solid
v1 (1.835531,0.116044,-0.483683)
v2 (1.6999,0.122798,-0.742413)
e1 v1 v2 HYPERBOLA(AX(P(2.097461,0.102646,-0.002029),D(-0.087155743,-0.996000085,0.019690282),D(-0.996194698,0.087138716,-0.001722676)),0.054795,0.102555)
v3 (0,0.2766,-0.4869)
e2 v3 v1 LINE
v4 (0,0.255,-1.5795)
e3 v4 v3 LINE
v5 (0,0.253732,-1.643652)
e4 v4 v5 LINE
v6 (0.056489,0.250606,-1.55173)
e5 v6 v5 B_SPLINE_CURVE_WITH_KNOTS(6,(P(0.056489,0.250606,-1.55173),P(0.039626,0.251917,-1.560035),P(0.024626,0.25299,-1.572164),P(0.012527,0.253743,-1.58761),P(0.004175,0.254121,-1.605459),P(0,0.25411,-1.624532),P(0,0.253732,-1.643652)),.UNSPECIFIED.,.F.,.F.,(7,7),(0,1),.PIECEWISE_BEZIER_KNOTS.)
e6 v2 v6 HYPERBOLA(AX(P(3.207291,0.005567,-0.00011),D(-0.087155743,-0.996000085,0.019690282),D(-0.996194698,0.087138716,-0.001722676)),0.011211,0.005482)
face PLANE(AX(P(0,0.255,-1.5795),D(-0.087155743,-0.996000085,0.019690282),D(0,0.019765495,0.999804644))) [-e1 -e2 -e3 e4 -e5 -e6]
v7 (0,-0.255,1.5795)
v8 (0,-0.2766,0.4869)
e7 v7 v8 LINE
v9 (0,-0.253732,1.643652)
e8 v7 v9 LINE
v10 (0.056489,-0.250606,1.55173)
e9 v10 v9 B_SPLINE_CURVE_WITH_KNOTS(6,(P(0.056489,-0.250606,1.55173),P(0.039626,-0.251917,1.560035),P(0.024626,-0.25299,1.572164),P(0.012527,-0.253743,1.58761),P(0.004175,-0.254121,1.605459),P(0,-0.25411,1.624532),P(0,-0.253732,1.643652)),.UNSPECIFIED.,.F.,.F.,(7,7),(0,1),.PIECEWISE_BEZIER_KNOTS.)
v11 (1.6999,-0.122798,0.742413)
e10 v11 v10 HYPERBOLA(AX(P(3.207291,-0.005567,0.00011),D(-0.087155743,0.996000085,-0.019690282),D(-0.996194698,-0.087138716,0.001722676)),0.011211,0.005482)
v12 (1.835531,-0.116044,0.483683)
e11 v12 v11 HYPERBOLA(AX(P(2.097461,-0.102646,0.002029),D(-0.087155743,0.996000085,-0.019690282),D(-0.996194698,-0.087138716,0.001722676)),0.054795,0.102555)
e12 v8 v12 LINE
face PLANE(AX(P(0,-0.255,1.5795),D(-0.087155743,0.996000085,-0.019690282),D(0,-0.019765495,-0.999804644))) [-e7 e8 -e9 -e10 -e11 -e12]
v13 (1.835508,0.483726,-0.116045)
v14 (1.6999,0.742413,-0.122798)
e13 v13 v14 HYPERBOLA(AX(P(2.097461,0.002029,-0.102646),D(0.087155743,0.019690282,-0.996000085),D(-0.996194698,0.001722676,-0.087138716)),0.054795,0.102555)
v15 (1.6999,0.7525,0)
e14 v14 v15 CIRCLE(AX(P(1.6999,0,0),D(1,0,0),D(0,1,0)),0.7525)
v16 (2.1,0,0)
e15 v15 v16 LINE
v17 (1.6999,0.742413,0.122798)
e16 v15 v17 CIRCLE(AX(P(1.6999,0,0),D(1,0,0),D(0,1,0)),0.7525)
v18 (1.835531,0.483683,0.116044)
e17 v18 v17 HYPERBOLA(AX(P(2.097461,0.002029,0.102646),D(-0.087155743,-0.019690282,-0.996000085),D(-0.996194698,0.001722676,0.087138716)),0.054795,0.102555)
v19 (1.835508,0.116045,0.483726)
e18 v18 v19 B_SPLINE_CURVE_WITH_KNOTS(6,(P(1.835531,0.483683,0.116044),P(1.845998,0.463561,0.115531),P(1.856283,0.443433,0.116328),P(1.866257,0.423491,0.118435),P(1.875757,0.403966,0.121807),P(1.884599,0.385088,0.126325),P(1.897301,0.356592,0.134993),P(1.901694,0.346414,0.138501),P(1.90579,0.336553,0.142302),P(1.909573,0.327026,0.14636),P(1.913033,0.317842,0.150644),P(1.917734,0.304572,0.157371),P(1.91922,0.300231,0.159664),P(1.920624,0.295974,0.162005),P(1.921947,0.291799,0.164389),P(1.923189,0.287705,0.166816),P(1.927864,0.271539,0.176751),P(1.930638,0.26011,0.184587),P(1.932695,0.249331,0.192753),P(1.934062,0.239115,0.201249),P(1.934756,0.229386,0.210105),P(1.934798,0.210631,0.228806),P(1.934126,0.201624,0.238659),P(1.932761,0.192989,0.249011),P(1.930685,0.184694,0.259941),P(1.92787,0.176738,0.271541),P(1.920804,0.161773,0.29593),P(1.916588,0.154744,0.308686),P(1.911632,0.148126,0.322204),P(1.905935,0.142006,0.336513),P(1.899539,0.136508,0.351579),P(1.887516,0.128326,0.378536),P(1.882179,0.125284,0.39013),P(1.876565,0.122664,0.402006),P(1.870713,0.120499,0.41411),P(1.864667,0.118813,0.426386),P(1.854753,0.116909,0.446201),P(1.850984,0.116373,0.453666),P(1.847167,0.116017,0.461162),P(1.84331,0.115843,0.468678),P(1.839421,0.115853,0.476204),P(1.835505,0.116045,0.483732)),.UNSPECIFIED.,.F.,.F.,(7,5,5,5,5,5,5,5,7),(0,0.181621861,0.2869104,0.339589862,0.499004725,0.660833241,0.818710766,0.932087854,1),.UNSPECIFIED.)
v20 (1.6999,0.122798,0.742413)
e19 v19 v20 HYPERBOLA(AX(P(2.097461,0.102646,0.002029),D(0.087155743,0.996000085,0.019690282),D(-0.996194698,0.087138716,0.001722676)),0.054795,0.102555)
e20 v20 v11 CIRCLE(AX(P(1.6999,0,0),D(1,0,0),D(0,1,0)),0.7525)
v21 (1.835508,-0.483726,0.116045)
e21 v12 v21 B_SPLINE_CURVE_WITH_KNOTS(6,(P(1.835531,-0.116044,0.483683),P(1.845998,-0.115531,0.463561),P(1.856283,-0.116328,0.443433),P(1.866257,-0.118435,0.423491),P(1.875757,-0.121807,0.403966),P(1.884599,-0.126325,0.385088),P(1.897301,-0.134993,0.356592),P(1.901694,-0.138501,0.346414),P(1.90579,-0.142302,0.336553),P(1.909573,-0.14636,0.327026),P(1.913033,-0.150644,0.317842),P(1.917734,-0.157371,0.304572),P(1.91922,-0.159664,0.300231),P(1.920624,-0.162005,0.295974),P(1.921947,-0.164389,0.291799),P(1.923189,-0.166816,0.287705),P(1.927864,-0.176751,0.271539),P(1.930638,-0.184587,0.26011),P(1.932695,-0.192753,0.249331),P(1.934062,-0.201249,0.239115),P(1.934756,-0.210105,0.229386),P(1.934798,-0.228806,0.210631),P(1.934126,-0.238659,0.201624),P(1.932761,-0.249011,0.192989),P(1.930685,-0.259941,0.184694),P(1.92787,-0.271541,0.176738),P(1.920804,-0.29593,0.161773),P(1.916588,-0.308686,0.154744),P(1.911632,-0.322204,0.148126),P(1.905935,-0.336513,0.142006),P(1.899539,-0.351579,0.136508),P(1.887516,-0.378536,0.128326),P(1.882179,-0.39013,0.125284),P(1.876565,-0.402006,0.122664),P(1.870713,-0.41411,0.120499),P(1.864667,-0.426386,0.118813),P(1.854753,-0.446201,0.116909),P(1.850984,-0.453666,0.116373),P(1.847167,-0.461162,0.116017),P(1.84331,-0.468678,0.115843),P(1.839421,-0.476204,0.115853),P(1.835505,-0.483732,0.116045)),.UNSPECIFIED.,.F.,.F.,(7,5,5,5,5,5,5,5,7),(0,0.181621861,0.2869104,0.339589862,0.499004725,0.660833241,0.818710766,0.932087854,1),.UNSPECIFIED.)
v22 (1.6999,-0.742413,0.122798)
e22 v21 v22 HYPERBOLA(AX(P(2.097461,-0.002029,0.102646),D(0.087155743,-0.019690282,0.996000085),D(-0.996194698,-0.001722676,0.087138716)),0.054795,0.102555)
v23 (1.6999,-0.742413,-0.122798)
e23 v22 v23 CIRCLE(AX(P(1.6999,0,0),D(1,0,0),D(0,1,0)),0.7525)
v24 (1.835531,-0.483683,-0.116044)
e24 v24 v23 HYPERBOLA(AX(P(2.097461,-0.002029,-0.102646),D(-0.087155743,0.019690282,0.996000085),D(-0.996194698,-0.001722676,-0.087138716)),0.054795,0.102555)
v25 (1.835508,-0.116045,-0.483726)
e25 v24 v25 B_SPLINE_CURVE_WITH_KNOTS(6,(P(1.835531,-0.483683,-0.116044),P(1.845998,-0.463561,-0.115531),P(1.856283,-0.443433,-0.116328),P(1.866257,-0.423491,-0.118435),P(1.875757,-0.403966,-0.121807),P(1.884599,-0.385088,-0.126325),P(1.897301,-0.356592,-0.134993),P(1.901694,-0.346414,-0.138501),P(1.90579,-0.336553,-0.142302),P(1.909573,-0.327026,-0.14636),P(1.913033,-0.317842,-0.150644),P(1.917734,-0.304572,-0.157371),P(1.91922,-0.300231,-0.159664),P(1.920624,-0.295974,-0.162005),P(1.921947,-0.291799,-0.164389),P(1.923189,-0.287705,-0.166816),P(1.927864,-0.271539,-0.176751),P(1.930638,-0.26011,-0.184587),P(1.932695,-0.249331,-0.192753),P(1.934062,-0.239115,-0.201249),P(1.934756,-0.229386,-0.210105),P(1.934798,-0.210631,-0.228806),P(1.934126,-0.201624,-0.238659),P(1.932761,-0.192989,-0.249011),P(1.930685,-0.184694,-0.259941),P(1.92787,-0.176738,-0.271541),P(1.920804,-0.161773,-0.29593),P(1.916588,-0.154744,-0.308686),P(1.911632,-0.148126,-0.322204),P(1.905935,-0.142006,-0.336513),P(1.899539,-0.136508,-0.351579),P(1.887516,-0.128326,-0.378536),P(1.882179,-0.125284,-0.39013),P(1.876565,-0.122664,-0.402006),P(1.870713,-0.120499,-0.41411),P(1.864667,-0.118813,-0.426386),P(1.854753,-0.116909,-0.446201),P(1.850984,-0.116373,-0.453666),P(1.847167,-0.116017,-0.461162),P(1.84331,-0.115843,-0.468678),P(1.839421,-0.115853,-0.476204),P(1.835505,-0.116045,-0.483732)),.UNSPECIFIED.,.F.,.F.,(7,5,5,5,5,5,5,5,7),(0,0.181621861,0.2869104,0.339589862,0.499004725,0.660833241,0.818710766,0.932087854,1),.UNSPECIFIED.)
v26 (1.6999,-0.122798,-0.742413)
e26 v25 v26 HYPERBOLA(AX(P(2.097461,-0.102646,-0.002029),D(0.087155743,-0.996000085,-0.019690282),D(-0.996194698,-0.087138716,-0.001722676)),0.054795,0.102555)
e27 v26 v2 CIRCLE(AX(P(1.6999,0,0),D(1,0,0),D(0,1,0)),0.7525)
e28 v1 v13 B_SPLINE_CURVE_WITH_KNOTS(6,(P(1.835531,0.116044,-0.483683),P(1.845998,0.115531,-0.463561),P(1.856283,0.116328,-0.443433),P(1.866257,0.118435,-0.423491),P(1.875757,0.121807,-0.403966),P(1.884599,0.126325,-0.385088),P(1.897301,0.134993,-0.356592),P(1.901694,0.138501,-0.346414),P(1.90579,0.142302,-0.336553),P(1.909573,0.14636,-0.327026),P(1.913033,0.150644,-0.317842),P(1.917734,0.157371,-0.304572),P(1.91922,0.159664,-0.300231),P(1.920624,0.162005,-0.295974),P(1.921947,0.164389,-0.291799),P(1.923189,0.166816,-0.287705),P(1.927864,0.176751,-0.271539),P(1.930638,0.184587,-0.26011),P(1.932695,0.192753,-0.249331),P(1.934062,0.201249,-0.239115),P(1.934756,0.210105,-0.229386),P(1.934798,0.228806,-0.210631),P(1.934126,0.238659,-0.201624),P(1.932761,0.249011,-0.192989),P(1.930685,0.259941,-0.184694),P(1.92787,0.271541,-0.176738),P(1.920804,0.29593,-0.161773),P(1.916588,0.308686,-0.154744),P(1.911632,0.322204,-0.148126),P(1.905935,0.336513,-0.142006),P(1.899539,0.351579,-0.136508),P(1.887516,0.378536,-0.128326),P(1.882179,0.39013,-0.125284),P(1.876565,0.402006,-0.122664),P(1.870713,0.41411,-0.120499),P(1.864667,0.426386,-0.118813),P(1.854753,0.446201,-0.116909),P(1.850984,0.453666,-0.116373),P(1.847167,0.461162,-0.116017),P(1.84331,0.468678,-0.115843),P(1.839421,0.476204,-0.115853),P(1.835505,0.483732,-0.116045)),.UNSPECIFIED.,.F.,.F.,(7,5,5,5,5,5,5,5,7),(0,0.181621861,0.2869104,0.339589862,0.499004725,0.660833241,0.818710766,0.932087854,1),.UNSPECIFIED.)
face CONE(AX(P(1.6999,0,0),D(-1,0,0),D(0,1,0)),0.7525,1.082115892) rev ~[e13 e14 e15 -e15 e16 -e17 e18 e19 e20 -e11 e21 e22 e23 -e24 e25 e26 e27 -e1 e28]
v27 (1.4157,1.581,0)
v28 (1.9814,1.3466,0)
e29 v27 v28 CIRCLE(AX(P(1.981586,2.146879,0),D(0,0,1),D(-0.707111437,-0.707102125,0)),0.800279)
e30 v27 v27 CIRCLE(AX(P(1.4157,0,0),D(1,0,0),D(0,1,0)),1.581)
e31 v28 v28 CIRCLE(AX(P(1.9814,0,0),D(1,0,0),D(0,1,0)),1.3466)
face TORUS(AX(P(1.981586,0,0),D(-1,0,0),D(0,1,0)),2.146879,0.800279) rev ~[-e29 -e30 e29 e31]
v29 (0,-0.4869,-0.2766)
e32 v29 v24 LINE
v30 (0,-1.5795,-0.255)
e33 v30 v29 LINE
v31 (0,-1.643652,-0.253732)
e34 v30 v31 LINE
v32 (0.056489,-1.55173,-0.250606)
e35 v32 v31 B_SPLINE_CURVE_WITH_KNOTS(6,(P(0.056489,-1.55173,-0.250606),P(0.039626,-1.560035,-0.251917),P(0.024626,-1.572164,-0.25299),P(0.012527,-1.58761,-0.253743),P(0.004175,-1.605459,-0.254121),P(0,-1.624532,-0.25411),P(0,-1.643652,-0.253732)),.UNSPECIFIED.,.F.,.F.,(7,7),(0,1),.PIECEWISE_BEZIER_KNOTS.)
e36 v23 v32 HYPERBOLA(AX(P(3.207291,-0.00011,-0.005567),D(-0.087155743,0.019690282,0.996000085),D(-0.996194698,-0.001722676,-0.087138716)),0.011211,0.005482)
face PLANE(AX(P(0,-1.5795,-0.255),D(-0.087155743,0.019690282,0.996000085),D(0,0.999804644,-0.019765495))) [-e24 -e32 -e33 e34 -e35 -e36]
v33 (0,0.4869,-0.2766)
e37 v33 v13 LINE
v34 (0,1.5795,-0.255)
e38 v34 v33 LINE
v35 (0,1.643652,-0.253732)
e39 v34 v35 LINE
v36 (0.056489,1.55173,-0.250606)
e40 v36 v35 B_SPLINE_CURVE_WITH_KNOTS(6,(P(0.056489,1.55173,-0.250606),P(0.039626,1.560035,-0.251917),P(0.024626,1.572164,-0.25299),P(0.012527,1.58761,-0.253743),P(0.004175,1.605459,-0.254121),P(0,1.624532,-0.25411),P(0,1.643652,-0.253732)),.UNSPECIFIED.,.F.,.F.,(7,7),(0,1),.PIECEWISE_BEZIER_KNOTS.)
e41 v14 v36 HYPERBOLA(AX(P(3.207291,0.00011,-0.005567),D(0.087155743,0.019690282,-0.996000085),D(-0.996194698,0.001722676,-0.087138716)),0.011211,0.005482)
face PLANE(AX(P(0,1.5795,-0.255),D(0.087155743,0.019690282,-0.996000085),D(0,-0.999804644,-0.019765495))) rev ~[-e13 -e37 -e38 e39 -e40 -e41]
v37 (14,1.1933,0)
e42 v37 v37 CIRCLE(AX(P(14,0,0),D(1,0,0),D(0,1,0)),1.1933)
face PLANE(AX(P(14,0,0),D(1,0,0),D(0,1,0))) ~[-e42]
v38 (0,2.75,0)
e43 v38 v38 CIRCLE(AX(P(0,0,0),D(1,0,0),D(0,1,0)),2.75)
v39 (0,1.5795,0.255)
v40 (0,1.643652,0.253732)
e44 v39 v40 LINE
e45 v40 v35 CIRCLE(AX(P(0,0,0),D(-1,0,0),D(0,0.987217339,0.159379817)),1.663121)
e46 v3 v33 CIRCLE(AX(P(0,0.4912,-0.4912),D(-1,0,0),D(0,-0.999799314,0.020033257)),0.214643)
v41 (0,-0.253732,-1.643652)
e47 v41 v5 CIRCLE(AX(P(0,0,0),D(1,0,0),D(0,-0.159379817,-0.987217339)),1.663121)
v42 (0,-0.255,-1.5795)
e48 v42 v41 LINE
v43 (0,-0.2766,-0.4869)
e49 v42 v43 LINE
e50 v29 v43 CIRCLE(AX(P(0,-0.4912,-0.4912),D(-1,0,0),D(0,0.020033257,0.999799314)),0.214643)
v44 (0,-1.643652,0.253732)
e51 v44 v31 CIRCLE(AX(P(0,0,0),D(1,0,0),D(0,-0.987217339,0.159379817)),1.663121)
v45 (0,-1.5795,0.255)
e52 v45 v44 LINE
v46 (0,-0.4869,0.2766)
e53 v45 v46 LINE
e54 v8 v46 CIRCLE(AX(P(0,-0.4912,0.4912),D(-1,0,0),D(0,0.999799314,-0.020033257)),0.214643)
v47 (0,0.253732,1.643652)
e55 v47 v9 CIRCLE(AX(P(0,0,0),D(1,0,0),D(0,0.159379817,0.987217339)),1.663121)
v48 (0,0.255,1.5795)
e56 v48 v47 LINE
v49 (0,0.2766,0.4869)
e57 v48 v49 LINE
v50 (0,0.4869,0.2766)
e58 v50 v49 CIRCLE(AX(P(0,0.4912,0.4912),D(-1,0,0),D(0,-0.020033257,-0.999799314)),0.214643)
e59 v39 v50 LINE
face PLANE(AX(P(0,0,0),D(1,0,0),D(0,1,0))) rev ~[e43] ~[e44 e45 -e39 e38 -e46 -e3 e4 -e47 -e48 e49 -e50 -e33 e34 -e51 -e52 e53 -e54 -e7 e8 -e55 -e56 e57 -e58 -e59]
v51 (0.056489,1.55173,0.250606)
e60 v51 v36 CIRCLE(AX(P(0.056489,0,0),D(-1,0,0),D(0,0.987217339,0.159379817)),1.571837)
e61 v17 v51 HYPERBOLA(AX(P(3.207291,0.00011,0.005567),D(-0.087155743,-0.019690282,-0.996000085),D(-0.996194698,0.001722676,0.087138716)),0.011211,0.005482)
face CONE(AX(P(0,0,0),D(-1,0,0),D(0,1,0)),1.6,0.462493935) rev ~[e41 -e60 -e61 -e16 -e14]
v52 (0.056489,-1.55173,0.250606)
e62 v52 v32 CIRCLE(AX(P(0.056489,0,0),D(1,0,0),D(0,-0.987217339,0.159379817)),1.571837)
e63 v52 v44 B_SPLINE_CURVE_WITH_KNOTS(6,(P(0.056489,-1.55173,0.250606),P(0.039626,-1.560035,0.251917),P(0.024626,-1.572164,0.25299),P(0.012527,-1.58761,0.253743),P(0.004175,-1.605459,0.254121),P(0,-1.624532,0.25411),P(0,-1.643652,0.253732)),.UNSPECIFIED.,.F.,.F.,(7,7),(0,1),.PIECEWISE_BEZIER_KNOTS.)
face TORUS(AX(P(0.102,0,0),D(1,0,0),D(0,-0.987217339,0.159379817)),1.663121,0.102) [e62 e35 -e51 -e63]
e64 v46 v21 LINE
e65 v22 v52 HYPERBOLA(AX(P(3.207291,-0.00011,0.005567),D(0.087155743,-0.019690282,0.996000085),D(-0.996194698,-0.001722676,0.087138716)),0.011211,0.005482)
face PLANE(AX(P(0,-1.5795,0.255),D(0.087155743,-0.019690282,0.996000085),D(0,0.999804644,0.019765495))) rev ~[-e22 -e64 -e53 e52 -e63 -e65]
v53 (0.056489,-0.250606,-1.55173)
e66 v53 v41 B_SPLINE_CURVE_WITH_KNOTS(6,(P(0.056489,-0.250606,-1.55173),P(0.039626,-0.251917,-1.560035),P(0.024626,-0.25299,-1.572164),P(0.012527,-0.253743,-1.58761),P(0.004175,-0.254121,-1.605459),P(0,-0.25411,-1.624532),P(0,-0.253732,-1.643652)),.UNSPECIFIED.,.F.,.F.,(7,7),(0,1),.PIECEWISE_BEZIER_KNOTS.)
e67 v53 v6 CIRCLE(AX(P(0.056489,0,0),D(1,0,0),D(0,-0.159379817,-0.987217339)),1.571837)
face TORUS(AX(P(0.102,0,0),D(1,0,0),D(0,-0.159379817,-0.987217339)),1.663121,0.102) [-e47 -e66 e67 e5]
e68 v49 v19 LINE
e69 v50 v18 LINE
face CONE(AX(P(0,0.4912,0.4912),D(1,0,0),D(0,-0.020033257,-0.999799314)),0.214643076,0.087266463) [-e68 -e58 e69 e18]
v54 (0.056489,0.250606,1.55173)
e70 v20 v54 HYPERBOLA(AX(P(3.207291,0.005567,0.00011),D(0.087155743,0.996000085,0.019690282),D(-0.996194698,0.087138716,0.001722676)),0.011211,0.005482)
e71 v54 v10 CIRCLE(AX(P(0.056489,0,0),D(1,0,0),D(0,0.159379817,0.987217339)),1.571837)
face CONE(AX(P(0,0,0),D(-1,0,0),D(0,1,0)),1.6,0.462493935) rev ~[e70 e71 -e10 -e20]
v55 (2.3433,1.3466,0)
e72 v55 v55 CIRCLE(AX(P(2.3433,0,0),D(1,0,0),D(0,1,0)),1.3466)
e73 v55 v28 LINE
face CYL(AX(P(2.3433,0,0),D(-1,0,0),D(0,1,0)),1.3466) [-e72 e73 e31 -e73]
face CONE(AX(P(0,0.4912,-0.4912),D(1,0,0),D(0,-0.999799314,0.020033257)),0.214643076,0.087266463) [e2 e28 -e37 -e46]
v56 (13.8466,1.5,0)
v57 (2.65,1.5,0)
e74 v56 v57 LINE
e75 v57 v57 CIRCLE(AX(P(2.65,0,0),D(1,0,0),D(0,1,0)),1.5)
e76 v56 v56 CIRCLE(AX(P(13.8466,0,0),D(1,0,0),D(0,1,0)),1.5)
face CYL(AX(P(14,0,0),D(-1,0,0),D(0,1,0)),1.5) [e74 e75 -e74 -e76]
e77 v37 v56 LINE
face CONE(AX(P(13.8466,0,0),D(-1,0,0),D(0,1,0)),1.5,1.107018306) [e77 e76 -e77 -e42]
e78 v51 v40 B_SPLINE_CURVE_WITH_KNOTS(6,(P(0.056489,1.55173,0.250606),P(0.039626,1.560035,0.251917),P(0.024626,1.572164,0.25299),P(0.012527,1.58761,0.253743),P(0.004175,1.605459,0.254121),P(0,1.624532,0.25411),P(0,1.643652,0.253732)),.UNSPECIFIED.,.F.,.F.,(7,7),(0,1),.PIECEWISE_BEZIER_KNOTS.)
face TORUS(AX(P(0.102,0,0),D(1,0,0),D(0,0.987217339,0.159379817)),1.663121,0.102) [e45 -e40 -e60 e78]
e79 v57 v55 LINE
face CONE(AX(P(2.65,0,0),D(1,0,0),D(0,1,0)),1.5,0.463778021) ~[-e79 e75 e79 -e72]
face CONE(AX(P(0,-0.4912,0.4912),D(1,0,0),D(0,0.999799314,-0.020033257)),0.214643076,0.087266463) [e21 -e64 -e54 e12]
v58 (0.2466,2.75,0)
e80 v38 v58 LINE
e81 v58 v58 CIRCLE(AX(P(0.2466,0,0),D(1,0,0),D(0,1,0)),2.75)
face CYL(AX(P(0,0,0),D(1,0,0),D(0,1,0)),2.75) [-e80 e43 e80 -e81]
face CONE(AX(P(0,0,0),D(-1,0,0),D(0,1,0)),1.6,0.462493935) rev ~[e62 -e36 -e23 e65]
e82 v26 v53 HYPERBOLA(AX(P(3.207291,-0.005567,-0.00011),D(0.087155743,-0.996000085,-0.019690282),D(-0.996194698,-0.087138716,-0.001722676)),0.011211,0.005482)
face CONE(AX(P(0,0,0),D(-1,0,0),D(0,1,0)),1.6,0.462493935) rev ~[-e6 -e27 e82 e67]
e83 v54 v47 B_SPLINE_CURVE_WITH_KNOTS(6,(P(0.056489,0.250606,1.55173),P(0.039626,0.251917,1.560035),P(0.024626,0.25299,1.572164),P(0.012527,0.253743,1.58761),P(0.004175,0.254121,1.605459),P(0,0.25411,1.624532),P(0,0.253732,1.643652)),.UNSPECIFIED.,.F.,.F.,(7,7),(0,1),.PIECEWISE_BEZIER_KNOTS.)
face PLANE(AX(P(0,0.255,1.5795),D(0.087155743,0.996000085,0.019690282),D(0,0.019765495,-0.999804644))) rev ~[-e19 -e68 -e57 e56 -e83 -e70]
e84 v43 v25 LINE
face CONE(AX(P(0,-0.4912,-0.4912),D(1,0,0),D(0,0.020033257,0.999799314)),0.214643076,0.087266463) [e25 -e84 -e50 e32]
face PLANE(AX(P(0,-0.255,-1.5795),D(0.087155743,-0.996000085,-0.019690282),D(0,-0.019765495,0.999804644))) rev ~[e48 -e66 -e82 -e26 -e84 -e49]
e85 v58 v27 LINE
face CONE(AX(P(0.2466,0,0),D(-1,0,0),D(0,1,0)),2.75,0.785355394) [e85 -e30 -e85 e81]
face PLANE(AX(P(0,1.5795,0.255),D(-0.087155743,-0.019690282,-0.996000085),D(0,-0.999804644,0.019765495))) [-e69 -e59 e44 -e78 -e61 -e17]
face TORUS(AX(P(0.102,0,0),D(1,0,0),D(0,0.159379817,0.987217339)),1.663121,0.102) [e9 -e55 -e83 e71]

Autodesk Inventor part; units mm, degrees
ref_plane "YZ Plane" through (0, 0, 0) normal (1, 0, 0) x (0, 1, 0)
ref_plane "XZ Plane" through (0, 0, 0) normal (0, 1, 0) x (-1, 0, 0)
sketch "Sketch1" plane through (0, 0, 0) normal (0, 0, 1) x (1, 0, 0)
  line L0 (2.1, 0) -> (14, 0)
  line L1 (14, 0) -> (14, 1.5)
  line L2 (14, 1.5) -> (2.65, 1.5)
  line L3 (2.65, 1.5) -> (2.3433, 1.3466)
  line L4 (2.3433, 1.3466) -> (1.9814, 1.3466)
  line L5 (0, 2.75) -> (0, 1.6)
  line L6 (0, 1.6) -> (1.6999, 0.7525)
  line L7 (1.6999, 0.7525) -> (2.1, 0)
  line L8 (-2.8, 0) -> (16.8, 0) projected
  line L9 (0, -0.55) -> (0, 3.3) projected
  line L10 (0, 2.75) -> (0.2466, 2.75)
  line L11 (0.2466, 2.75) -> (1.4157, 1.581)
  line L12 (2.65, 1.5) -> (1.4966, 1.5) construction
  arc A0 (1.4157, 1.581) -> (1.9814, 1.3466) centre (1.9814, 2.1466) ccw
  point P0 (1.65, 1.3466)
  dimension "d1" = 11.35
  dimension "d2" = 3
  dimension "d3" = 2.6933
  dimension "d4" = 3.2
  dimension "d5" = 26.5
  dimension "d6" = 62
  dimension "d7" = 2.1
  dimension "d8" = 0.3067
  dimension "d12" = 5.5
  dimension "d13" = 45
  dimension "d15" = 14
  dimension "d24" = 1.65
  dimension "d93" = 0.8
revolve "Body" add sketch "Sketch1" angle 360 about axis through (2.1, 0, 0) along (1, 0, 0) contours L7 L6 L5 L10 L11 A0 L4 L3 L2 L1 L0
sketch "Sketch2" plane through (0, 0, 0) normal (-1, 0, 0) x (0, 0, 1)
  line L0 (0, 1.6) -> (0, 0) construction
  line L1 (0, 0) -> (1.6, 0) construction
  arc A0 (0.48, 0) -> (0, 0.48) centre (0, 0) ccw construction
  arc A1 (0.56, 0) -> (0, 0.56) centre (0, 0) ccw construction
  arc A2 (1.5795, 0.255) -> (0.255, 1.5795) centre (0, 0) ccw
  line L2 (0, 0) -> (1.1314, 1.1314) construction
  line L3 (0.255, 1.5795) -> (0.2766, 0.4869)
  line L4 (1.5795, 0.255) -> (0.4869, 0.2766)
  arc A3 (0.255, 1.5795) -> (0, 1.6) centre (0, 0) ccw
  arc A4 (1.6, 0) -> (1.5795, 0.255) centre (0, 0) ccw
  line L5 (0, -3.85) -> (0, 3.85) projected
  line L6 (-3.85, 0) -> (3.85, 0) projected
  arc A5 (0.255, -1.5795) -> (1.5795, -0.255) centre (0, 0) ccw
  line L7 (0.255, -1.5795) -> (0.2766, -0.4869)
  line L8 (1.5795, -0.255) -> (0.4869, -0.2766)
  arc A6 (0, -1.6) -> (0.255, -1.5795) centre (0, 0) ccw
  arc A7 (1.5795, -0.255) -> (1.6, 0) centre (0, 0) ccw
  arc A8 (-0.255, 1.5795) -> (-1.5795, 0.255) centre (0, 0) ccw
  line L9 (-0.255, 1.5795) -> (-0.2766, 0.4869)
  line L10 (-1.5795, 0.255) -> (-0.4869, 0.2766)
  arc A9 (0, 1.6) -> (-0.255, 1.5795) centre (0, 0) ccw
  arc A10 (-1.5795, 0.255) -> (-1.6, 0) centre (0, 0) ccw
  arc A11 (-0.255, -1.5795) -> (0, -1.6) centre (0, 0) ccw
  arc A12 (-1.5795, -0.255) -> (-0.255, -1.5795) centre (0, 0) ccw
  arc A13 (-1.6, 0) -> (-1.5795, -0.255) centre (0, 0) ccw
  line L11 (-1.5795, -0.255) -> (-0.4869, -0.2766)
  line L12 (-0.255, -1.5795) -> (-0.2766, -0.4869)
  arc A14 (0.2766, 0.4869) -> (0.4869, 0.2766) centre (0.4912, 0.4912) ccw
  arc A15 (0.4869, -0.2766) -> (0.2766, -0.4869) centre (0.4912, -0.4912) ccw
  arc A16 (-0.4869, 0.2766) -> (-0.2766, 0.4869) centre (-0.4912, 0.4912) ccw
  arc A17 (-0.2766, -0.4869) -> (-0.4869, -0.2766) centre (-0.4912, -0.4912) ccw
  point P0 (1.1314, -1.1314)
  point P1 (-1.1314, 1.1314)
  point P2 (-1.1314, -1.1314)
  dimension "d17" = 0.96
  dimension "d18" = 1.12
  dimension "d19" = 3.2
  dimension "d20" = 45
  dimension "d21" = 0.255
extrude "Slot" add sketch "Sketch2" against normal up to next draft 5 contours L4 A14 L3 A2 | A5 L7 A15 L8 | L9 A16 L10 A8 | A12 L11 A17 L12
fillet "Fillet1" radius 0.102 4 edges at (0, 1.6, 0) (0, 0, -1.6) (0, -1.6, 0) (0, 0, 1.6)
thread "Thread" size "M3x0.5" class "6g" standard "ISO Metric profile" length 11.35
chamfer "Chamfer1" distance 0.3067 distance2 0.1534 1 edges at (14, -1.5, 0) measured on face at (14, 0.263, 0.1197)
ref_plane "Work Plane2" through (3.35, 0, 0) normal (0, 0, -1) x (1, 0, 0)
equation "\"d1\" = GEL"
equation "\"d2\" = GD"
equation "\"d3\" = BDM"
equation "\"d4\" = SDM"
equation "\"d7\" = INTI"
equation "\"d8\" = GAL"
equation "\"d12\" = KOD"
equation "\"d13\" = 0.5 * SEWI"
equation "\"d15\" = NLG"
equation "\"d24\" = KOH"
equation "\"d93\" = R"
equation "\"d17\" = 0.3 * SDM"
equation "\"d18\" = 0.35 * SDM"
equation "\"d19\" = SDM"
equation "\"d21\" = 0.5 * SBR"
equation "\"d23\" = 0.2 * SBR"
equation "\"d10\" = GEL"
equation "\"d25\" = -0.5 * SPD + 0.5 * GD"
equation "\"d26\" = 0.5 * GAL"
equation "\"NLG\" = 14"
equation "\"GEL\" = 11.35"
equation "\"GAL\" = 0.61345 * PTC"
equation "\"SPD\" = NND - 1.2269 * PTC"
equation "\"KOD\" = 5.5"
equation "\"KOH\" = 1.65"
equation "\"SBR\" = 0.51"
equation "\"INTI\" = 2.1"
equation "\"SDM\" = 3.2"
equation "\"GD\" = NND"
equation "\"BDM\" = NND - GAL"
equation "\"SEWI\" = 90deg"
equation "\"d9\" = SDM"
equation "\"R\" = 0.8"
equation "\"GUL\" = 0.61345 * PTC"
equation "\"TOA\" = 30deg"
equation "\"EPV\" = 3.15"
equation "\"THREADDIA\" = 3"
equation "\"PTC\" = 0.5"
equation "\"NND\" = 3"
equation "\"GD1\" = THREADDIA - 1.2269 * PTC"
properties part number "ISO 7046-1  - M3 x 14 - 4.8 - H" material "Steel"
